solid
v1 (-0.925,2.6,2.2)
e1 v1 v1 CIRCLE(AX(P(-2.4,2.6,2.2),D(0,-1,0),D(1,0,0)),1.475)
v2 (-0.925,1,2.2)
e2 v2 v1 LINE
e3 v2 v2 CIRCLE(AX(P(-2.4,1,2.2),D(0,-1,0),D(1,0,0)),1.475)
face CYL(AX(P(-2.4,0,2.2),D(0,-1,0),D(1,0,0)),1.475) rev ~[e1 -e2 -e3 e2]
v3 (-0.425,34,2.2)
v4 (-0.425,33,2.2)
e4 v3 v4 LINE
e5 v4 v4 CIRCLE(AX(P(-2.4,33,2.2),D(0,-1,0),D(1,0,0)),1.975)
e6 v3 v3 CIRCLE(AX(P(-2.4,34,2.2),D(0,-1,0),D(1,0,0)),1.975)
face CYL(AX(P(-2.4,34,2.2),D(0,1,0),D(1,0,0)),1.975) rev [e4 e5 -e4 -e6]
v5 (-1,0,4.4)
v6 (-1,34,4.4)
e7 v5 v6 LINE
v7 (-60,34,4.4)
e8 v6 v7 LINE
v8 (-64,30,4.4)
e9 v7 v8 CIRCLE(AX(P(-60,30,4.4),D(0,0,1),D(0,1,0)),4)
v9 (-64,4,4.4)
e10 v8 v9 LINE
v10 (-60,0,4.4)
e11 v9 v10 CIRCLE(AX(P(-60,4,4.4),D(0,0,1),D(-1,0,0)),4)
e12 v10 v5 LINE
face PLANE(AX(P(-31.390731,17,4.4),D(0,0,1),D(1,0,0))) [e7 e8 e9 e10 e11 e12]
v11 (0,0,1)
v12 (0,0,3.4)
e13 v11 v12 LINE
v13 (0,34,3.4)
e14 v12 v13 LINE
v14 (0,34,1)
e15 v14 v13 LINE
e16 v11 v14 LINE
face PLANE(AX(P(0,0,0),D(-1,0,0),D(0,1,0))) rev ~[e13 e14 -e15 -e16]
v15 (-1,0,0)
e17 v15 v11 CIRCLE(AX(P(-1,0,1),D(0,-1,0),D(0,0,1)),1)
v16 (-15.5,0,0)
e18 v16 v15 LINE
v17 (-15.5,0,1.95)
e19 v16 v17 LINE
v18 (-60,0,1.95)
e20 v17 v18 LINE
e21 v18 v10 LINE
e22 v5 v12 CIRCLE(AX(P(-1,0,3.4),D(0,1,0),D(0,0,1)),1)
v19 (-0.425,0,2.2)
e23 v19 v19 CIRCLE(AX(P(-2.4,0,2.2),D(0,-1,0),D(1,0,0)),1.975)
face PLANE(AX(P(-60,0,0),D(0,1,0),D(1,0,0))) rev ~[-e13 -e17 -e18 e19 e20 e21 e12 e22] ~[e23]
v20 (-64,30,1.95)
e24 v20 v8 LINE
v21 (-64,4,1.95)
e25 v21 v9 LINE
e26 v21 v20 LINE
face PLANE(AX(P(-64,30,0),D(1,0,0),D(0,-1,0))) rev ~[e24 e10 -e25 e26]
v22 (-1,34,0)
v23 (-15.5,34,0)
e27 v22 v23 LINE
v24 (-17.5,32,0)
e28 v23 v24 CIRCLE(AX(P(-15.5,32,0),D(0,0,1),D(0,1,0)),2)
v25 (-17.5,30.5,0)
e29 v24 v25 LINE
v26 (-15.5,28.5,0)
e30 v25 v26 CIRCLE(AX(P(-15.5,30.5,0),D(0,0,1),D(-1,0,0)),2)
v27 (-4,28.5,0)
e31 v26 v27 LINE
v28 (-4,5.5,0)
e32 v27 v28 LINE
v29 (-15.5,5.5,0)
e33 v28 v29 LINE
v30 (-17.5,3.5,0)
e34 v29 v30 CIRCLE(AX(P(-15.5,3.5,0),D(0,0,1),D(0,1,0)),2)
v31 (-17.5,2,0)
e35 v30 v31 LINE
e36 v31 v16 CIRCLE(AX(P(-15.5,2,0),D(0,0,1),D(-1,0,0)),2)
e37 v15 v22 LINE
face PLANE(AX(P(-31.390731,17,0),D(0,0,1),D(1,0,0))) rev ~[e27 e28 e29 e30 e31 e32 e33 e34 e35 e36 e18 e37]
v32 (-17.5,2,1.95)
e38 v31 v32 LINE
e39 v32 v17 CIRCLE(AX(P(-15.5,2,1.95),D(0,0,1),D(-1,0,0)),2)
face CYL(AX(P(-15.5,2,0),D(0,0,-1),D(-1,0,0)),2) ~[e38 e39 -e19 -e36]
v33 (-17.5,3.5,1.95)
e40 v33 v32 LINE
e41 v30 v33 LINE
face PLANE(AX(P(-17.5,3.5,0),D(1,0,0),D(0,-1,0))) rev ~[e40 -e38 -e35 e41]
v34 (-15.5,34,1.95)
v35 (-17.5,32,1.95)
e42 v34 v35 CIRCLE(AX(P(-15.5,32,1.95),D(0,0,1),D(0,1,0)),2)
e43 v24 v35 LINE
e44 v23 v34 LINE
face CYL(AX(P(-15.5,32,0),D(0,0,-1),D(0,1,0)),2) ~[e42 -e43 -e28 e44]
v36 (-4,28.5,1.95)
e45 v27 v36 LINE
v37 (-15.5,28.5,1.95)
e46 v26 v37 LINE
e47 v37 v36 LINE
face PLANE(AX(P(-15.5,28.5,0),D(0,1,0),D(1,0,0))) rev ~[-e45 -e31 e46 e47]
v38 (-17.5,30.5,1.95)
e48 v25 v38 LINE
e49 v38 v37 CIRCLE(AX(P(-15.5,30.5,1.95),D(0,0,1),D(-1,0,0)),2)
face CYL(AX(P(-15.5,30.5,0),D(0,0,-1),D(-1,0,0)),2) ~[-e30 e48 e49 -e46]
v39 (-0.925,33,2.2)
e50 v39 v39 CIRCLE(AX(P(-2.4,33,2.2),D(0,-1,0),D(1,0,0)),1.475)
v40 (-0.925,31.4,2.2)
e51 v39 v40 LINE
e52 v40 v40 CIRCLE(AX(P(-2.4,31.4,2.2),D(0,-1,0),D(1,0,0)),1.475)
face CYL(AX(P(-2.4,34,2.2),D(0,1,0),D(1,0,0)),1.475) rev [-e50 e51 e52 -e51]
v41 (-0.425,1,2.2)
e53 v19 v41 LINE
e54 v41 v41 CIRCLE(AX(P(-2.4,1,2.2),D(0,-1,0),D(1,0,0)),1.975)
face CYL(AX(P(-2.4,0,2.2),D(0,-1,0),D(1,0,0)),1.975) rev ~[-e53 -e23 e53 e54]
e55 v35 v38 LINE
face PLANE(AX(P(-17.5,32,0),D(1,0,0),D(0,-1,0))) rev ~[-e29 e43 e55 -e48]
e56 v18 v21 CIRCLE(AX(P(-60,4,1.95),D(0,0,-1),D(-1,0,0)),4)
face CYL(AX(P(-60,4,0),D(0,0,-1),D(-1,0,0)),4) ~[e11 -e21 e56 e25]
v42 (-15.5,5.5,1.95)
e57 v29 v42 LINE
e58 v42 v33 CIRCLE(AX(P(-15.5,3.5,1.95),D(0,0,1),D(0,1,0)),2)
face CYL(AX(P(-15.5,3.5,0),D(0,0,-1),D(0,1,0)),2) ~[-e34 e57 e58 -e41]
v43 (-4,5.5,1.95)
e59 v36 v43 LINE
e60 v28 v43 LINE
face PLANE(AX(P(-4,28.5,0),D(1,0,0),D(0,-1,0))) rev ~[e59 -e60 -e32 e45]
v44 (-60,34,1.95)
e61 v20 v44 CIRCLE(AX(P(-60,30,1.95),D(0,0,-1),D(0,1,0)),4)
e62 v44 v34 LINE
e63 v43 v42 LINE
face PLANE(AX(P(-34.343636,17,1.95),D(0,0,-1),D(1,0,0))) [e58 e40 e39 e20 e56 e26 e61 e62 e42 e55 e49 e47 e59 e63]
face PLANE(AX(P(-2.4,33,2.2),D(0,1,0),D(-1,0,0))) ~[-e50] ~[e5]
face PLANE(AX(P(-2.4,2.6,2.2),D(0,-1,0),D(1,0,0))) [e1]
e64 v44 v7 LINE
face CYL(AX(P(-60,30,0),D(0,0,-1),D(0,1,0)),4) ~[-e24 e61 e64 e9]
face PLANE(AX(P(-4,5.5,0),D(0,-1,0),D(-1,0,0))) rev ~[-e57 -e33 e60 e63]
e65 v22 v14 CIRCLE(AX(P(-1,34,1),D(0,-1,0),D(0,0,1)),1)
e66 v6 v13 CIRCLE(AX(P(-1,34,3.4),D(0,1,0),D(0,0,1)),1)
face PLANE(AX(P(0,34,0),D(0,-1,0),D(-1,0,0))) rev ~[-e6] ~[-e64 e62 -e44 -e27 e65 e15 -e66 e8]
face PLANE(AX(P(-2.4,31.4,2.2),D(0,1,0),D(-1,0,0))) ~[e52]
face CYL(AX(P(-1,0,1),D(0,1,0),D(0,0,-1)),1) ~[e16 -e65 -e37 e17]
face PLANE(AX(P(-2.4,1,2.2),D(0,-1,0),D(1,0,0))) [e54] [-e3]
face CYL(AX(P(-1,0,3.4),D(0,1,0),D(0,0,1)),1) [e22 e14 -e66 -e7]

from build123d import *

# Parameters (mm, degrees)
F1_DEPTH = 4.4
F3_DEPTH = 1.95
F6_R     = 1.475
F8_DEPTH = 2.6
F6_R_2   = 1.975
F9_DEPTH = 1
F10_R    = 1


# Not quite as in the source:
# - a pattern or mirror of a feature is missing from the dataset's text; its kind, count and spacing are read off the source's solid


with BuildPart() as f1:
    # F0 (on Top) → F1 (new body)
    with BuildSketch(Plane.XY):
        with BuildLine():
            Line((-60, 0), (0, 0))
            Line((0, 0), (0, 34))
            Line((0, 34), (-60, 34))
            ThreePointArc((-60, 34), (-62.8284271247, 32.8284271247), (-64, 30))
            Line((-64, 30), (-64, 4))
            ThreePointArc((-64, 4), (-62.8284271247, 1.1715728753), (-60, 0))
        make_face()
    extrude(amount=F1_DEPTH)

    # F2 (on face) → F3 (cut)
    with BuildSketch(Plane(origin=(0, 0, 0), x_dir=(1, 0, 0), z_dir=(0, 0, -1))):
        with BuildLine():
            ThreePointArc((-15.5, -34), (-16.9142135624, -33.4142135624), (-17.5, -32))
            Line((-17.5, -32), (-17.5, -30.5))
            ThreePointArc((-17.5, -30.5), (-16.9142135624, -29.0857864376), (-15.5, -28.5))
            Line((-15.5, -28.5), (-4, -28.5))
            Line((-4, -28.5), (-4, -5.5))
            Line((-4, -5.5), (-15.5, -5.5))
            ThreePointArc((-15.5, -5.5), (-16.9142135624, -4.9142135624), (-17.5, -3.5))
            Line((-17.5, -3.5), (-17.5, -2))
            ThreePointArc((-17.5, -2), (-16.9142135624, -0.5857864376), (-15.5, 0))
            Line((-15.5, 0), (-64, 0))
            Line((-64, 0), (-64, -34))
            Line((-64, -34), (-15.5, -34))
        make_face()
    extrude(amount=-F3_DEPTH, mode=Mode.SUBTRACT)

    # F6 (on face) → F8 (cut)
    with BuildSketch(Plane.XZ):
        with Locations((-2.4, 2.2)):
            Circle(F6_R)
    f8 = extrude(amount=-F8_DEPTH, mode=Mode.SUBTRACT)

    # F8_copies: F8 across plane
    add(f8.mirror(Plane.ZX.offset(17)), mode=Mode.SUBTRACT)

    # F6 (on face) → F9 (cut)
    with BuildSketch(Plane.XZ):
        with Locations((-2.4, 2.2)):
            Circle(F6_R_2)
        with Locations((-2.4, 2.2)):
            Circle(F6_R, mode=Mode.SUBTRACT)
    f9 = extrude(amount=-F9_DEPTH, mode=Mode.SUBTRACT)

    # F9_copies: F9 across plane
    add(f9.mirror(Plane.ZX.offset(17)), mode=Mode.SUBTRACT)

    # F10
    f10_edges = [f1.edges().sort_by_distance(p)[0] for p in [
        (0, 17, 4.4),
        (0, 17, 0),
    ]]
    fillet(f10_edges, radius=F10_R)


solid = f1.part
